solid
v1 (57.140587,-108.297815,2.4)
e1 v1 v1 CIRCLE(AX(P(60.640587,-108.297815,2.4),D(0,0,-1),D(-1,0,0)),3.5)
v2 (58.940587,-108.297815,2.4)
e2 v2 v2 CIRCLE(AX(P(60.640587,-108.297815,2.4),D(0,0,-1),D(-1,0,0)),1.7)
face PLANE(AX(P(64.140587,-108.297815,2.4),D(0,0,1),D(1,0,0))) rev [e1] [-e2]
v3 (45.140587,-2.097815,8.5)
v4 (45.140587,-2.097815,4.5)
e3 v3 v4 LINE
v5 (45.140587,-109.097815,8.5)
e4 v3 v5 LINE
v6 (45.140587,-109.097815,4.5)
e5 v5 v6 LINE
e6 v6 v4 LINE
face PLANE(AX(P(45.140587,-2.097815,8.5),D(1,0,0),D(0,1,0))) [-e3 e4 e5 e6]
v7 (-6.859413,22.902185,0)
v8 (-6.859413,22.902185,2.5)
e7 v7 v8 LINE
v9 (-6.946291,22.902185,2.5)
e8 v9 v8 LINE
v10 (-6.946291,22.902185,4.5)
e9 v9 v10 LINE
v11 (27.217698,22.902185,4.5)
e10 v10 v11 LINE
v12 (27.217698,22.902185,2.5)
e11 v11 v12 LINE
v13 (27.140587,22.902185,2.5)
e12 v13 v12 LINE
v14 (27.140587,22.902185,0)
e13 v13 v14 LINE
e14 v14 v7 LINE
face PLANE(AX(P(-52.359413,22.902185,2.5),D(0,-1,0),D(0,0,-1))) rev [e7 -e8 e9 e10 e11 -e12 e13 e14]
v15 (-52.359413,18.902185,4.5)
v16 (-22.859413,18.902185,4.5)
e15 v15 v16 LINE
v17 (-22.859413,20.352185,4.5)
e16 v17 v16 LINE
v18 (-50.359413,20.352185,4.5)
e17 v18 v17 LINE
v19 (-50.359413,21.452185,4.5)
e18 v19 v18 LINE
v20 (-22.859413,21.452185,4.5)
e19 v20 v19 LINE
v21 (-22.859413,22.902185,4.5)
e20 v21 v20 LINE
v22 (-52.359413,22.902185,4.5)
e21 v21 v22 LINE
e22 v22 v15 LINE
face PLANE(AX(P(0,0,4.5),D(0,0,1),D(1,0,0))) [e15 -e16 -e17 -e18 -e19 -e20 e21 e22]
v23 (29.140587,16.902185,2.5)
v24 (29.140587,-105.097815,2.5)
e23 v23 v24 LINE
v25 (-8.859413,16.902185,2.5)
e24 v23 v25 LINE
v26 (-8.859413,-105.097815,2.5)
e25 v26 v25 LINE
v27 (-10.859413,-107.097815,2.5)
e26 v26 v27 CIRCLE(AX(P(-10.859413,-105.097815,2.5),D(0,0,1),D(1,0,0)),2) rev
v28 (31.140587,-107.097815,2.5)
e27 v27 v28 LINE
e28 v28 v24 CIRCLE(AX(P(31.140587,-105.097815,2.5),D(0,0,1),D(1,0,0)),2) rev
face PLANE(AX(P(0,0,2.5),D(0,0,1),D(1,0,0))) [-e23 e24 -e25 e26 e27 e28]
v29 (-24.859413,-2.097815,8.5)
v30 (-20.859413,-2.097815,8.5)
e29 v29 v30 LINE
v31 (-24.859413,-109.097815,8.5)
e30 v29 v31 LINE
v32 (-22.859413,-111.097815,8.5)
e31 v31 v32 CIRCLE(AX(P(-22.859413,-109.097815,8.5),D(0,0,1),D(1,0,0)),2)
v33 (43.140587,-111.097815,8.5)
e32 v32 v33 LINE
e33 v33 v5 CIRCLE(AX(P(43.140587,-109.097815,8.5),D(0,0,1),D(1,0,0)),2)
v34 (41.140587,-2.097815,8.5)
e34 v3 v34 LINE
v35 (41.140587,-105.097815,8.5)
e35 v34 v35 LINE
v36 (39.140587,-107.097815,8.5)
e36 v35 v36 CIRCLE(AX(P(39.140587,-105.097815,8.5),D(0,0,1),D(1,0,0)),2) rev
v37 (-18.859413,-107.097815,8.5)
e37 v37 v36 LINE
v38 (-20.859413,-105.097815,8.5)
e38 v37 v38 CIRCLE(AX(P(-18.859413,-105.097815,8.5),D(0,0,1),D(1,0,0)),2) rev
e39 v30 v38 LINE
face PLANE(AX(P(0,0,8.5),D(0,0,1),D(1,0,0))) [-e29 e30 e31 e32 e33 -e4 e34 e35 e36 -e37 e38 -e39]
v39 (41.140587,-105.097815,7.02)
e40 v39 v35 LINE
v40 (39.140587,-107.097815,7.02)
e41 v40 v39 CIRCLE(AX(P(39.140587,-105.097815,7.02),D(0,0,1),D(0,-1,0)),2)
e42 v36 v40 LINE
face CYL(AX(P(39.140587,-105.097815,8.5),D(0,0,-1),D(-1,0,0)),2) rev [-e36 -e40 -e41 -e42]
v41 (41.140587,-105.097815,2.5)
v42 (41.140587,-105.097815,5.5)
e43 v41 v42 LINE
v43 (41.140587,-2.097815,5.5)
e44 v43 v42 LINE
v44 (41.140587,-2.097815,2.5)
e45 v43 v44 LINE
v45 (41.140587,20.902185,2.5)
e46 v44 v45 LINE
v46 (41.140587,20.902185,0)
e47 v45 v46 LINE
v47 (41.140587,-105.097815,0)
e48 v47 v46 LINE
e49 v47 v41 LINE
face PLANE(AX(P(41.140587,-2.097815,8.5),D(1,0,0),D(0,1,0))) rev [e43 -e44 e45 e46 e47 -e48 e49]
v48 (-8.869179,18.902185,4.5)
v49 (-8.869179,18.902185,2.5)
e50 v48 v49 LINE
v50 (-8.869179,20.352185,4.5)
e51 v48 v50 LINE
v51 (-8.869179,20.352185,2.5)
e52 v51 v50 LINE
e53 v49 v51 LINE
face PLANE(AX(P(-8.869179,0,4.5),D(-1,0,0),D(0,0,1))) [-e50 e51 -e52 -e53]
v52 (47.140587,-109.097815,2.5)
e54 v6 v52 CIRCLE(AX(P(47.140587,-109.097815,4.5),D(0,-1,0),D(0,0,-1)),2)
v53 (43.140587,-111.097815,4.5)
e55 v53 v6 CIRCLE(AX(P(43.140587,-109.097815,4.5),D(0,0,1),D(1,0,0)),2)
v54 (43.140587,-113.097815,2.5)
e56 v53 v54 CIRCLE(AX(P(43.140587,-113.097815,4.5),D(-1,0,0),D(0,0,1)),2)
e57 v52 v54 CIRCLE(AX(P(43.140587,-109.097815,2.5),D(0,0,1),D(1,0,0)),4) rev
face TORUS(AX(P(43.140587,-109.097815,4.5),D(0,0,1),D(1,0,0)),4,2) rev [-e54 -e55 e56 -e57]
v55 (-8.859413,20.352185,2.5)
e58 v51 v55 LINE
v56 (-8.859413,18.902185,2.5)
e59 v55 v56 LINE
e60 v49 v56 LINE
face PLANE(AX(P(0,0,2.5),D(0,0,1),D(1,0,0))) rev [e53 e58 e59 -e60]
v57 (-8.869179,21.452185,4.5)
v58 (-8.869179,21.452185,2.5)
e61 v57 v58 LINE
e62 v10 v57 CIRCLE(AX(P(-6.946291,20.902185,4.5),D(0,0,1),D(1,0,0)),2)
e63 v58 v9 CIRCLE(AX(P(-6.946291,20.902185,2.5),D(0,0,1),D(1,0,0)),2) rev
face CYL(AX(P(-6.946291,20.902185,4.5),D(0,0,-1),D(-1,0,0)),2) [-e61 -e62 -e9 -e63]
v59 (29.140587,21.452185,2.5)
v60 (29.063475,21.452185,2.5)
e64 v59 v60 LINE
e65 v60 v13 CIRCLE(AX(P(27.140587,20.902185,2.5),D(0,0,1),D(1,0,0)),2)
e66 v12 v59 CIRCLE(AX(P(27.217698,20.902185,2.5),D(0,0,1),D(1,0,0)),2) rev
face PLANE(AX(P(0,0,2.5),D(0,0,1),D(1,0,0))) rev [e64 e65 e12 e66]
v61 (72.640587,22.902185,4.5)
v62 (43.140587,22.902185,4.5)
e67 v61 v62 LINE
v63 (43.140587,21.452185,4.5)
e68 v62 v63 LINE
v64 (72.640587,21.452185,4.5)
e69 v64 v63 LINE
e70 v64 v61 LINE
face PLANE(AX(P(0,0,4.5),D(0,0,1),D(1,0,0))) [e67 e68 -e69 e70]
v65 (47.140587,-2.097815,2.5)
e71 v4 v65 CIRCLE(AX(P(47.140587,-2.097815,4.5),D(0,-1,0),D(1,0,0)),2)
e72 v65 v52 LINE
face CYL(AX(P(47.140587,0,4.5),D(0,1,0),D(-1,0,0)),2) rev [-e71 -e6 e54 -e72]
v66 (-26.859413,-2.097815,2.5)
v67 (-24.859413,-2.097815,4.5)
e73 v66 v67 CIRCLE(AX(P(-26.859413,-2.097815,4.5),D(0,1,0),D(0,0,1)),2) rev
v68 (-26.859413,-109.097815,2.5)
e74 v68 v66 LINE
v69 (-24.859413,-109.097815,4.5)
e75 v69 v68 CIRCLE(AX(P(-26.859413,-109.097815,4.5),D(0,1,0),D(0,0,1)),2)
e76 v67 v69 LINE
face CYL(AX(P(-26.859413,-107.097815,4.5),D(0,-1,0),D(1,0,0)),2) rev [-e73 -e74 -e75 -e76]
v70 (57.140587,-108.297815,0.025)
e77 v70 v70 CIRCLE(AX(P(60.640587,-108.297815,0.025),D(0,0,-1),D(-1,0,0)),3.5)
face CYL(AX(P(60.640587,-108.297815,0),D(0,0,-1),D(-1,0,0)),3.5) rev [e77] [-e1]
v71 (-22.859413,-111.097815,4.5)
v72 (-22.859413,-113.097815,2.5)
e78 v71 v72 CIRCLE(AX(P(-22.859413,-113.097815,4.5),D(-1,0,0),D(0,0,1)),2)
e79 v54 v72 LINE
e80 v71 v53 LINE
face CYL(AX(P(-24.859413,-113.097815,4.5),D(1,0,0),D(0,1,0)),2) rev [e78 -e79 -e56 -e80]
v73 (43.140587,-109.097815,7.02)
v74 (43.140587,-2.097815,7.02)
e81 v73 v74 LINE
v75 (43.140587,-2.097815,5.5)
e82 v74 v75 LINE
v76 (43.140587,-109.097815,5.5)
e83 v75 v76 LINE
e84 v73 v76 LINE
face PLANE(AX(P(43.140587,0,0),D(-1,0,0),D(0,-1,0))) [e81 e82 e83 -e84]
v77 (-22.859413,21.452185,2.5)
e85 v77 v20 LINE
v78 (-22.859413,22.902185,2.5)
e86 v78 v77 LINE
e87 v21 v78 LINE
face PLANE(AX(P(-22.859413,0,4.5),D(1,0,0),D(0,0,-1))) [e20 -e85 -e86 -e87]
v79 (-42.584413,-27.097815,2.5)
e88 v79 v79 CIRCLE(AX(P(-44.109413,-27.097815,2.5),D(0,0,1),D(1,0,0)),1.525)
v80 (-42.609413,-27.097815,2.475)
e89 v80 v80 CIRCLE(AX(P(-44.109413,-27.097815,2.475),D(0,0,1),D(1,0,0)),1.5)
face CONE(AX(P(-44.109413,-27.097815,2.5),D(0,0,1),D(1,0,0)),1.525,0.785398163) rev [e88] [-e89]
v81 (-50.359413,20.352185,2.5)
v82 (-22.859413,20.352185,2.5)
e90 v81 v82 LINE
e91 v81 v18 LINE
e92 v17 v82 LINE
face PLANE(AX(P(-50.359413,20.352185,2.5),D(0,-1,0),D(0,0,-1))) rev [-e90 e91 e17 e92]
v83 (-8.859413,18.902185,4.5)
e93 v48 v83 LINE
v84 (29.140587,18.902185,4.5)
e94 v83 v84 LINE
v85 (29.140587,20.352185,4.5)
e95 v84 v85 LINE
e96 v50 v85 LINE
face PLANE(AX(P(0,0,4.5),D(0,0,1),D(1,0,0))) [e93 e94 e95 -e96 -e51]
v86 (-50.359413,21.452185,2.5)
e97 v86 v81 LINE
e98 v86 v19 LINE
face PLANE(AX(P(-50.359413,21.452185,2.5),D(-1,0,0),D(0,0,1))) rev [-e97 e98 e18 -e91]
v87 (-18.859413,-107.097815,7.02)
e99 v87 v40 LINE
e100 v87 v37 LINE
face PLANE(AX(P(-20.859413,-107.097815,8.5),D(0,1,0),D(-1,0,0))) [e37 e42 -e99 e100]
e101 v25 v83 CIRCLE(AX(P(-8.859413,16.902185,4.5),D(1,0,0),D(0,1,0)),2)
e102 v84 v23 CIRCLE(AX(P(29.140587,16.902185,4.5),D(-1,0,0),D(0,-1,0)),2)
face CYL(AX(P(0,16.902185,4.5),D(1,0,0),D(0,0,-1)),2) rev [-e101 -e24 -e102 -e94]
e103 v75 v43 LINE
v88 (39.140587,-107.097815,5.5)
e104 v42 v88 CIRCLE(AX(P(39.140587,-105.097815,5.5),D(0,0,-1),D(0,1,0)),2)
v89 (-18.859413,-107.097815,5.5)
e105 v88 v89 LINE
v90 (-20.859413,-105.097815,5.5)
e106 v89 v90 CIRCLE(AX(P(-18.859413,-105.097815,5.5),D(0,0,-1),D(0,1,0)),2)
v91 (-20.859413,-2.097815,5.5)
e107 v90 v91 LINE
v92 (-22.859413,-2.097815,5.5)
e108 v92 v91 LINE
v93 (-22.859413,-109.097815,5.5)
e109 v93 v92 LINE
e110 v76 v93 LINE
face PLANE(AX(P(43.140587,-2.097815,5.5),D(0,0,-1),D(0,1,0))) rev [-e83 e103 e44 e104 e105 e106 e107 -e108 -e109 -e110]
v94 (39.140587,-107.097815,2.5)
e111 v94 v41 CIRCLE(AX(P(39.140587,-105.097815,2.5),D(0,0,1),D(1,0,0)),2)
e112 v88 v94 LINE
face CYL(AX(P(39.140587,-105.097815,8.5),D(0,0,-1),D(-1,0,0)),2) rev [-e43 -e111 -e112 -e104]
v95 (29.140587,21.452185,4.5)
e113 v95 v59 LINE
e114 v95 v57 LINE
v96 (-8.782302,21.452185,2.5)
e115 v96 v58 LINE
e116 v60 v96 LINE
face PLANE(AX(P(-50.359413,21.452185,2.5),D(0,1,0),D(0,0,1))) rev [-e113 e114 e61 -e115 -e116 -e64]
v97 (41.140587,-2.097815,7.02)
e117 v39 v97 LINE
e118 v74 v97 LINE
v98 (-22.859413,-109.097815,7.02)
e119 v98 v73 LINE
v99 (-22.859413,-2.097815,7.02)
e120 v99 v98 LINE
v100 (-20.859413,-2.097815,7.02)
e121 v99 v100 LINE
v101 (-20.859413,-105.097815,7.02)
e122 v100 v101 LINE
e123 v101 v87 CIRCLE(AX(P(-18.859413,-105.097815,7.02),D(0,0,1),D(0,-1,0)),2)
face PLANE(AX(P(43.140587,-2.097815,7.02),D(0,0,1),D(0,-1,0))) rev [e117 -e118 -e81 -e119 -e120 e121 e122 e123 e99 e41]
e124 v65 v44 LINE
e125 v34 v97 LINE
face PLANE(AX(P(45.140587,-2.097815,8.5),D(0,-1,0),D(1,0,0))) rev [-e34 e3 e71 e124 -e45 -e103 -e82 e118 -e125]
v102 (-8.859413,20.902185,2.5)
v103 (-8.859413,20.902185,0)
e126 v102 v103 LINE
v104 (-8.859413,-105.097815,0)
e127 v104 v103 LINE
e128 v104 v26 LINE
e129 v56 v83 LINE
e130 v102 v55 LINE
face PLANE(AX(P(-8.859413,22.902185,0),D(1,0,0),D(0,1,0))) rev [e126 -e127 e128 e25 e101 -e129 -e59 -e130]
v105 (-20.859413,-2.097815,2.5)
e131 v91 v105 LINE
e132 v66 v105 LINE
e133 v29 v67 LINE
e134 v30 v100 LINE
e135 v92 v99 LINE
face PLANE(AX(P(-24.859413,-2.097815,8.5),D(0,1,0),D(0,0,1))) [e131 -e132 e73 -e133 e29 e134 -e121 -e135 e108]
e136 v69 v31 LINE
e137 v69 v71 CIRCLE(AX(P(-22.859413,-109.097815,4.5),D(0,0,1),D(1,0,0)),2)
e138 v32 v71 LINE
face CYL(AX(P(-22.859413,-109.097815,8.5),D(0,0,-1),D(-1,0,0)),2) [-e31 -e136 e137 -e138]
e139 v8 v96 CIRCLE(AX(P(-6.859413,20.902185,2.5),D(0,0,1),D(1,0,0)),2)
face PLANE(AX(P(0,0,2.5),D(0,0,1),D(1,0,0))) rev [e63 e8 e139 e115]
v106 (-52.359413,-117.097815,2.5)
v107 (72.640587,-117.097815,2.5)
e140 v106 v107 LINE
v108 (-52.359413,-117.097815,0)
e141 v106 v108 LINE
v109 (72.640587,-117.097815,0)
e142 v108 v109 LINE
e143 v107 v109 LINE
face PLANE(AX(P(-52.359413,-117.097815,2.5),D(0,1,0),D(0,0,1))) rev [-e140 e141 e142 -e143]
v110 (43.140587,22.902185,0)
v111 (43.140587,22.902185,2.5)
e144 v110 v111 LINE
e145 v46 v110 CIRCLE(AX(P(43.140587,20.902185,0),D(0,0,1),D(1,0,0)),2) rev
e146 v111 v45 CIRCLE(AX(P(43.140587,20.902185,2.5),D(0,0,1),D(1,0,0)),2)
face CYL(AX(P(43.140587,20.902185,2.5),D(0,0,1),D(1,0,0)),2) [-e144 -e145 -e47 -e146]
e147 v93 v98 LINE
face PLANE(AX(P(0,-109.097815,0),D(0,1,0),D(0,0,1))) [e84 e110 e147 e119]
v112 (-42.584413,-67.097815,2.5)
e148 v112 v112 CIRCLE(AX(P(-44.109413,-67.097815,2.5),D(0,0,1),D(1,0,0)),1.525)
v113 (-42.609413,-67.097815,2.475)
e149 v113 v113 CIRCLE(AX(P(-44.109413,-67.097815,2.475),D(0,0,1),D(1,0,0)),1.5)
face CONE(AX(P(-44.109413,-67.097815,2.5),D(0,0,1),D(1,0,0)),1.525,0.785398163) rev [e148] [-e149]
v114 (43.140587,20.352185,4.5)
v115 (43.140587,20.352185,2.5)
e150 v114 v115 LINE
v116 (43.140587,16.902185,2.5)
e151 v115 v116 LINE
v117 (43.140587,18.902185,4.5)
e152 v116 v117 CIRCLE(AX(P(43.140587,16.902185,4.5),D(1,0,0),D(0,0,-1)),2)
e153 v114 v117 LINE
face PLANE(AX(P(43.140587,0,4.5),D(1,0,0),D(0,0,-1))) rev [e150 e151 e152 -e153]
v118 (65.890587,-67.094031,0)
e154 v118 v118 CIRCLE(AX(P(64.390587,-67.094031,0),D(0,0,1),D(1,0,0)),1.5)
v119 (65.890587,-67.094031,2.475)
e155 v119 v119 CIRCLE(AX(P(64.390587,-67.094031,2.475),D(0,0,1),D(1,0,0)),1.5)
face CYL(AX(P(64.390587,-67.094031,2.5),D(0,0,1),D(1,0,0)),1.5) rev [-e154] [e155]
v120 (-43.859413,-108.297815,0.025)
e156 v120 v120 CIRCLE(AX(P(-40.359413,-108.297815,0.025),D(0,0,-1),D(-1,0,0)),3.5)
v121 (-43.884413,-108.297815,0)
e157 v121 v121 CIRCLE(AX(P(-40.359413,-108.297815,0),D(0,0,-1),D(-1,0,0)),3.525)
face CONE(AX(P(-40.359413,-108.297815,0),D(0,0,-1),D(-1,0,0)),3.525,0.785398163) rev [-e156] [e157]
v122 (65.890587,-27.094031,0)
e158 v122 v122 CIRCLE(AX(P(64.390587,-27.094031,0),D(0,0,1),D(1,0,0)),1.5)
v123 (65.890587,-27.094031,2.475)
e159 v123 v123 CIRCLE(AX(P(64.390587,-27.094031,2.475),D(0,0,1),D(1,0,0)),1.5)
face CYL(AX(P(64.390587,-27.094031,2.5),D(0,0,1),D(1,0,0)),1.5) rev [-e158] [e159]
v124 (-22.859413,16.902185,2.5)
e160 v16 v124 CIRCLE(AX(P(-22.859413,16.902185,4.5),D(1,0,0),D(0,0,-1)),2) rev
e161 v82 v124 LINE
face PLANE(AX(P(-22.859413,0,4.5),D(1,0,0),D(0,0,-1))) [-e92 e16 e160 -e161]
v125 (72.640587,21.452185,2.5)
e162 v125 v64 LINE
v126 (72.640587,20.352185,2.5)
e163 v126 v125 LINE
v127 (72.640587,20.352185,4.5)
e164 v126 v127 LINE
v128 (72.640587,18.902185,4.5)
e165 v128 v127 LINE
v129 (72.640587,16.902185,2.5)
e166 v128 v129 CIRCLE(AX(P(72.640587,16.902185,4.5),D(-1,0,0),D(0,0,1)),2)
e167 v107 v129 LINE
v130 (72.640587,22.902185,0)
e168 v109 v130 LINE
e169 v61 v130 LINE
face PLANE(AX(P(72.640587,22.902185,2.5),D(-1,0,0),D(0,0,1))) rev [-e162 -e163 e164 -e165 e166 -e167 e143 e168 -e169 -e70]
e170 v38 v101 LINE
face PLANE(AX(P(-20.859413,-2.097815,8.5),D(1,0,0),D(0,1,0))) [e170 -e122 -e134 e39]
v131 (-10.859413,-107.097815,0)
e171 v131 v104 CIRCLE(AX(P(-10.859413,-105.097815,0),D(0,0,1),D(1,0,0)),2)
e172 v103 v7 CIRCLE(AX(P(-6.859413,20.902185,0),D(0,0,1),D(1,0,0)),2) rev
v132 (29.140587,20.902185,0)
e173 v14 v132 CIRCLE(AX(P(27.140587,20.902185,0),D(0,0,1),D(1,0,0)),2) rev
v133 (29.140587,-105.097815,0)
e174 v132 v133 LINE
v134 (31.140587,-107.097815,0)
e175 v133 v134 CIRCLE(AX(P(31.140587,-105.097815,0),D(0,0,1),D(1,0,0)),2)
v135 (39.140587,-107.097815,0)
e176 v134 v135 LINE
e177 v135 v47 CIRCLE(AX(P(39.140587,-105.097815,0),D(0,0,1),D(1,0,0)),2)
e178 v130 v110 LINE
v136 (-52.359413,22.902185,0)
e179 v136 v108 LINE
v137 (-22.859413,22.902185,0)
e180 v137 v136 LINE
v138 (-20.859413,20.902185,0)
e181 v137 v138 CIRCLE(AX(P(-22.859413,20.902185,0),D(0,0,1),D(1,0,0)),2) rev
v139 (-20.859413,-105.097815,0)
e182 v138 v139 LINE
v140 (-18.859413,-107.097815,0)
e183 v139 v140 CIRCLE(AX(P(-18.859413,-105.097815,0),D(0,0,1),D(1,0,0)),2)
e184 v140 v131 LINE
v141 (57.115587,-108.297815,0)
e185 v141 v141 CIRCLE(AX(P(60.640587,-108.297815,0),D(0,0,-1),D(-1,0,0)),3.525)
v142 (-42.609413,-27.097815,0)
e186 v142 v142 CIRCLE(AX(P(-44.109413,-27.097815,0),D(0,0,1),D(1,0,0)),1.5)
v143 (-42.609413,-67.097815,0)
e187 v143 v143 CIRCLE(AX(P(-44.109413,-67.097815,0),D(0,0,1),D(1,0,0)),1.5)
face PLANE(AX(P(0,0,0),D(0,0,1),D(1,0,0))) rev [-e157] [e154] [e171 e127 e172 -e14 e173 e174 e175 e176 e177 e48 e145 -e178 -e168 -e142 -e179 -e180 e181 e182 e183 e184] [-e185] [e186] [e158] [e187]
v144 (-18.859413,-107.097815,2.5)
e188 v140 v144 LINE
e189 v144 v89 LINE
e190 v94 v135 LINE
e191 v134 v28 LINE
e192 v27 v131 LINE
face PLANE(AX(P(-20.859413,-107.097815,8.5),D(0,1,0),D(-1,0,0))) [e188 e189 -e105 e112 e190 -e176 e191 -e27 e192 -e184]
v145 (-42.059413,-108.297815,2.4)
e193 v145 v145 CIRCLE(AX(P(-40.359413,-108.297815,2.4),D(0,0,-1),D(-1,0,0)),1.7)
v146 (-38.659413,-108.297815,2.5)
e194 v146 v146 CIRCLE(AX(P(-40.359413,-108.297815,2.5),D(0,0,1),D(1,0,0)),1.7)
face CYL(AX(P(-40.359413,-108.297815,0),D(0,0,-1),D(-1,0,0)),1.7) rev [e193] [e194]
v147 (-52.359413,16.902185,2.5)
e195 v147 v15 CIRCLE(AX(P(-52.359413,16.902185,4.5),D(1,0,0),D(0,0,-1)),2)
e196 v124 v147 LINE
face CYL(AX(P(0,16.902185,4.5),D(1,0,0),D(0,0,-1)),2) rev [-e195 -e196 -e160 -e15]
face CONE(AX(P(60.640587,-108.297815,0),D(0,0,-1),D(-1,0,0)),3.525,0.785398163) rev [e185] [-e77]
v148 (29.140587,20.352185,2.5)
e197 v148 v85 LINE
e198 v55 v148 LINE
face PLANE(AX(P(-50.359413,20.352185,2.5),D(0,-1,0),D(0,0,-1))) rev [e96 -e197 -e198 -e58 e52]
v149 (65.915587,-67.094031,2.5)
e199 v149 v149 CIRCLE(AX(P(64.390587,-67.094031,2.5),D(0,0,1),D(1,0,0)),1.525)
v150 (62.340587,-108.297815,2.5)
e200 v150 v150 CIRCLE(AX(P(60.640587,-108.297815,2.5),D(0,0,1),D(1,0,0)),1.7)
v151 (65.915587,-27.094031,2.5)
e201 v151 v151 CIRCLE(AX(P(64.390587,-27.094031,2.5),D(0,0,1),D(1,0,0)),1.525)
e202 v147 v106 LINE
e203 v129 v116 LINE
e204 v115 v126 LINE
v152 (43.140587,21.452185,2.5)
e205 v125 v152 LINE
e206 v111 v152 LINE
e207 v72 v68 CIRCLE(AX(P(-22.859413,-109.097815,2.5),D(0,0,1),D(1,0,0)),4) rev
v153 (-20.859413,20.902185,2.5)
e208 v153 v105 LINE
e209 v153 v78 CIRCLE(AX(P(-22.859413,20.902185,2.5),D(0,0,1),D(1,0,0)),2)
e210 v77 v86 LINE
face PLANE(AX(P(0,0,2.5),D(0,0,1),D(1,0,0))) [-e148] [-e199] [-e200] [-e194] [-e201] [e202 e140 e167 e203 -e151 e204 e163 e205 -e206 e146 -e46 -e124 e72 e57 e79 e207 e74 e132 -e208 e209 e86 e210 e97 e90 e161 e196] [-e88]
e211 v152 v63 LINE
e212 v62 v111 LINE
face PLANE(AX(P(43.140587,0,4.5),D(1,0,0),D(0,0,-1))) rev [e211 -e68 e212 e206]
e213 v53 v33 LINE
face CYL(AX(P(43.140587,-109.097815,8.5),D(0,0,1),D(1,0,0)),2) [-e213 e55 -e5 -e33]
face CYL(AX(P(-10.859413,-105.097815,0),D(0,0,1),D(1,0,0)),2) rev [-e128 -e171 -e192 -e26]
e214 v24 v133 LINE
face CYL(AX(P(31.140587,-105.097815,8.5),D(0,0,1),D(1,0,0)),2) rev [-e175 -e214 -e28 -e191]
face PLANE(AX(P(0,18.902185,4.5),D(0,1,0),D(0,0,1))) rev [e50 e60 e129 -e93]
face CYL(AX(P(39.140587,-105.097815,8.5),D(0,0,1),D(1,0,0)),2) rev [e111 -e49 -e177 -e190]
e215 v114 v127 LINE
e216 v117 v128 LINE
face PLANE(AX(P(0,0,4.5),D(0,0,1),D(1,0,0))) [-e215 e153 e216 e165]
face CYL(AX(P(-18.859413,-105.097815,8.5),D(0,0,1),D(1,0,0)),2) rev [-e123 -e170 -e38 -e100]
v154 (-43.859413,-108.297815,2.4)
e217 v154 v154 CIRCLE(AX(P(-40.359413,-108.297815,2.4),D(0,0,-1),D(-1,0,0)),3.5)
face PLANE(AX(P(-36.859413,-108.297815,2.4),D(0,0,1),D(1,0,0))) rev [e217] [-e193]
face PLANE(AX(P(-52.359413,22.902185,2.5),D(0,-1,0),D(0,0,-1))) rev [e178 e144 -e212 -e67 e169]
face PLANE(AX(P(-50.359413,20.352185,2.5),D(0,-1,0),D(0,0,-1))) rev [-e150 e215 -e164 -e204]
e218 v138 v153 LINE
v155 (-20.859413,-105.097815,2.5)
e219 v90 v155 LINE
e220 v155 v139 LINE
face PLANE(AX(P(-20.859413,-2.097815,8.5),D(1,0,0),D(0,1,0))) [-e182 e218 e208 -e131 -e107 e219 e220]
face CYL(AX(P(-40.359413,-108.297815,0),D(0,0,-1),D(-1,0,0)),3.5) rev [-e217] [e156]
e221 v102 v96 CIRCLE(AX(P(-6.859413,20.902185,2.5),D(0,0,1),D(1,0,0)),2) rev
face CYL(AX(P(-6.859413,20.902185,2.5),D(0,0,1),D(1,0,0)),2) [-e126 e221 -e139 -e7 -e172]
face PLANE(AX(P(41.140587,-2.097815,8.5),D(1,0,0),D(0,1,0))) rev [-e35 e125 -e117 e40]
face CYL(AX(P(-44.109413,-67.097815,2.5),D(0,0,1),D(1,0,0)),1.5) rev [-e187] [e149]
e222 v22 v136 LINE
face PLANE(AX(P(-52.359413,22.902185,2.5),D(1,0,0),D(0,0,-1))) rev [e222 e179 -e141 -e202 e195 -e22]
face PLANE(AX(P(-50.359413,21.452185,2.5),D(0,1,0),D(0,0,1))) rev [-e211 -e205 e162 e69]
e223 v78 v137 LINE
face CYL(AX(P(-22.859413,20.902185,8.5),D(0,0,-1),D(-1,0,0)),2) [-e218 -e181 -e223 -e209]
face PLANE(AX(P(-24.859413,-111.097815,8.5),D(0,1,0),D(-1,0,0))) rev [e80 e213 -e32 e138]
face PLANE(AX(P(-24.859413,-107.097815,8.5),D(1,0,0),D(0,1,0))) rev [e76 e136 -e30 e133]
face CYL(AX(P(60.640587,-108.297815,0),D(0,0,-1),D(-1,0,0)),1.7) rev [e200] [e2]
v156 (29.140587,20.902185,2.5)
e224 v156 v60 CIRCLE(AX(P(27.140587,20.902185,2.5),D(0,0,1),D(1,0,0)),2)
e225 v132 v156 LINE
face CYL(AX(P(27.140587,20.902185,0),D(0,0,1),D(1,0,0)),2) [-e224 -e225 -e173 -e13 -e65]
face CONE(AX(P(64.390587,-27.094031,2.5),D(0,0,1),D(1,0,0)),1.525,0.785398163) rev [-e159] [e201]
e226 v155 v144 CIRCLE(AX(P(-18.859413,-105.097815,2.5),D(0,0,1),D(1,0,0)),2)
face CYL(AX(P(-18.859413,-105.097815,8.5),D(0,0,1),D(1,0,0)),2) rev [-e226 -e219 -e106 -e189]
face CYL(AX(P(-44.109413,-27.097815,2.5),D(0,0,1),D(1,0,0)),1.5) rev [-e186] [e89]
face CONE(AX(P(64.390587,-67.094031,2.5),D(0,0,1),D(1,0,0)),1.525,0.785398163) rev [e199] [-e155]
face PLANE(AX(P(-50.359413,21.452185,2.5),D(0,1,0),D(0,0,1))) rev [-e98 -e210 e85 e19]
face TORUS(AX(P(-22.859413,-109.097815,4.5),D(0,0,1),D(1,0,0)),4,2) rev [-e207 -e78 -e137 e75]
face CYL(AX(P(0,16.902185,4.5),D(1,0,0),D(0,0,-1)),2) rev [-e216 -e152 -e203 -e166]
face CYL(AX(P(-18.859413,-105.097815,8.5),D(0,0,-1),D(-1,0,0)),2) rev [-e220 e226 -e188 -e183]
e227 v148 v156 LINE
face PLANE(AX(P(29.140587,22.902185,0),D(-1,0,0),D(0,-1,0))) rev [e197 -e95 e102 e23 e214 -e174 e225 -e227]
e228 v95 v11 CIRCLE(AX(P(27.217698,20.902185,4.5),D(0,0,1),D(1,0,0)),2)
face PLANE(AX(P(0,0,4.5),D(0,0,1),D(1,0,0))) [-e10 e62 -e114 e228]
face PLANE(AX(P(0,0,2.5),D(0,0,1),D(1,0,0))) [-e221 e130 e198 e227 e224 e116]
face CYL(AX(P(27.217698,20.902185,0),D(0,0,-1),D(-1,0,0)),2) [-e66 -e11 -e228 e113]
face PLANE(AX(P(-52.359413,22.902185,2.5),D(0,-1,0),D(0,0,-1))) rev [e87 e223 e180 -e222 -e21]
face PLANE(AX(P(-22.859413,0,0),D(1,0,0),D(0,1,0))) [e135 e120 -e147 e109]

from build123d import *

# Parameters (mm, degrees)
ESBO_O1_W                                    = 125
ESBO_O1_H                                    = 140
RESSALTO_EXTRUS_O1_DEPTH                     = 2.5
RESSALTO_EXTRUS_O2_DEPTH                     = 6
ESBO_O3_W                                    = 1.52
ESBO_O3_H                                    = 105
CORTE_EXTRUS_O1_DEPTH                        = 2
ESBO_O4_W                                    = 1.52
ESBO_O4_H                                    = 105
CORTE_EXTRUS_O2_DEPTH                        = 2
ESBO_O5_W                                    = 66
ESBO_O5_H                                    = 1.52
CORTE_EXTRUS_O3_DEPTH                        = 2
FILETE1_R                                    = 2
FILETE2_R                                    = 2
FILETE3_R                                    = 2
ESBO_O6_W                                    = 12
ESBO_O6_H                                    = 130
CORTE_EXTRUS_O4_DEPTH                        = 138.929522592
FILETE4_R                                    = 2
FILETE5_R                                    = 2
ESBO_O7_W                                    = 19.009766083
ESBO_O7_H                                    = 4
ESBO_O7_W_2                                  = 19
ESBO_O7_W_3                                  = 29.5
RESSALTO_EXTRUS_O3_DEPTH                     = 2
ESBO_O8_W                                    = 123
ESBO_O8_H                                    = 1.1
CORTE_EXTRUS_O5_DEPTH                        = 2
FILETE6_R                                    = 2
FUROS_GUIA_COM_3_0MM1_D                      = 3
FUROS_GUIA_COM_3_0MM1_CSINK_D                = 3.05
FUROS_GUIA_COM_3_0MM1_CSINK_ANGLE            = 90
REBAIXO_PARA_PARAFUSO_COM_CABE_A_PAN_2_COUNT = 2
REBAIXO_PARA_PARAFUSO_COM_CABE_A_PAN_2_PITCH = 101


with BuildPart() as part:
    # Esboço1 → Ressalto-extrusão1 (new body)
    with BuildSketch(Plane.XY):
        with Locations((10.140586838, -47.097815293)):
            Rectangle(ESBO_O1_W, ESBO_O1_H)
    extrude(amount=RESSALTO_EXTRUS_O1_DEPTH)

    # Esboço2 → Ressalto-extrusão2 (add)
    with BuildSketch(Plane.XY.offset(2.5)):
        Polygon((-24.859413162, -2.097815293), (-20.859413162, -2.097815293), (-20.859413162, -107.097815293), (41.140586838, -107.097815293), (41.140586838, -2.097815293), (45.140586838, -2.097815293), (45.140586838, -107.097815293), (45.140586838, -111.097815293), (-24.859413162, -111.097815293), (-24.859413162, -107.097815293), align=None)
    extrude(amount=RESSALTO_EXTRUS_O2_DEPTH)

    # Esboço3 → Corte-extrusão1 (cut)
    with BuildSketch(Plane.ZY.offset(-41.140586838)):
        with Locations((6.26, -54.597815293)):
            Rectangle(ESBO_O3_W, ESBO_O3_H)
    extrude(amount=-CORTE_EXTRUS_O1_DEPTH, mode=Mode.SUBTRACT)

    # Esboço4 → Corte-extrusão2 (cut)
    with BuildSketch(Plane(origin=(-20.859413162, 0, 0), x_dir=(0, 0, -1), z_dir=(1, 0, 0))):
        with Locations((-6.26, -54.597815293)):
            Rectangle(ESBO_O4_W, ESBO_O4_H)
    extrude(amount=-CORTE_EXTRUS_O2_DEPTH, mode=Mode.SUBTRACT)

    # Esboço5 → Corte-extrusão3 (cut)
    with BuildSketch(Plane(origin=(0, -107.097815293, 0), x_dir=(1, 0, 0), z_dir=(0, 1, 0))):
        with Locations((10.140586838, -6.26)):
            Rectangle(ESBO_O5_W, ESBO_O5_H)
    extrude(amount=-CORTE_EXTRUS_O3_DEPTH, mode=Mode.SUBTRACT)

    # Filete1
    filete1_edges = [part.edges().sort_by_distance(p)[0] for p in [
        (41.140586838, -107.097815293, 7.76),
        (-20.859413162, -107.097815293, 7.76),
        (41.140586838, -107.097815293, 4),
        (-20.859413162, -107.097815293, 4),
    ]]
    fillet(filete1_edges, radius=FILETE1_R)

    # Filete2
    filete2_edges = [part.edges().sort_by_distance(p)[0] for p in [
        (-24.859413162, -111.097815293, 5.5),
        (45.140586838, -111.097815293, 5.5),
    ]]
    fillet(filete2_edges, radius=FILETE2_R)

    # Filete3
    filete3_edges = [part.edges().sort_by_distance(p)[0] for p in [
        (10.140586838, -111.097815293, 2.5),
        (-24.273626724, -110.512028855, 2.5),
        (44.5548004, -110.512028855, 2.5),
        (-24.859413162, -55.597815293, 2.5),
        (45.140586838, -55.597815293, 2.5),
    ]]
    fillet(filete3_edges, radius=FILETE3_R)

    # Esboço6 → Corte-extrusão4 (cut, through all)
    with BuildSketch(Plane.XY.offset(2.5)):
        with Locations((-14.859413162, -42.097815293)):
            Rectangle(ESBO_O6_W, ESBO_O6_H)
        with Locations((35.140586838, -42.097815293)):
            Rectangle(ESBO_O6_W, ESBO_O6_H)
    extrude(amount=-CORTE_EXTRUS_O4_DEPTH, mode=Mode.SUBTRACT)

    # Filete4
    filete4_edges = [part.edges().sort_by_distance(p)[0] for p in [
        (-20.859413162, 22.902184707, 1.25),
        (-8.859413162, 22.902184707, 1.25),
        (41.140586838, 22.902184707, 1.25),
        (29.140586838, 22.902184707, 1.25),
    ]]
    fillet(filete4_edges, radius=FILETE4_R)

    # Filete5
    filete5_edges = [part.edges().sort_by_distance(p)[0] for p in [
        (-20.859413162, -107.097815293, 1.25),
        (-8.859413162, -107.097815293, 1.25),
        (41.140586838, -107.097815293, 1.25),
        (29.140586838, -107.097815293, 1.25),
    ]]
    fillet(filete5_edges, radius=FILETE5_R)

    # Esboço7 → Ressalto-extrusão3 (add)
    with BuildSketch(Plane.XY.offset(2.5)):
        with Locations((0.635703797, 20.902184707)):
            Rectangle(ESBO_O7_W, ESBO_O7_H)
        with Locations((19.640586838, 20.902184707)):
            Rectangle(ESBO_O7_W_2, ESBO_O7_H)
        with Locations((-37.609413162, 20.902184707)):
            Rectangle(ESBO_O7_W_3, ESBO_O7_H)
        with Locations((57.890586838, 20.902184707)):
            Rectangle(ESBO_O7_W_3, ESBO_O7_H)
    extrude(amount=RESSALTO_EXTRUS_O3_DEPTH)

    # Esboço8 → Corte-extrusão5 (cut)
    with BuildSketch(Plane.XY.offset(4.5)):
        with Locations((11.140586838, 20.902184707)):
            Rectangle(ESBO_O8_W, ESBO_O8_H)
    extrude(amount=-CORTE_EXTRUS_O5_DEPTH, mode=Mode.SUBTRACT)

    # Filete6
    # the kernel refuses this fillet: 2 mm, written as the material it adds along each edge
    with BuildSketch(Plane(origin=(29.140586838, 18.902184707, 2.5), x_dir=(0, 0, 1), z_dir=(-1, 0, 0))) as filete6_piece_1:
        with BuildLine():
            CenterArc((FILETE6_R, -FILETE6_R), FILETE6_R, 90, 90)
            Line((0, -FILETE6_R), (0, 0))
            Line((0, 0), (FILETE6_R, 0))
        make_face()
    extrude(amount=38)
    with BuildSketch(Plane(origin=(-52.359413162, 18.902184707, 2.5), x_dir=(0, 0, 1), z_dir=(1, 0, 0)), Plane(origin=(43.140586838, 18.902184707, 2.5), x_dir=(0, 0, 1), z_dir=(1, 0, 0))) as filete6_piece_2:
        with BuildLine():
            CenterArc((FILETE6_R, FILETE6_R), FILETE6_R, 180, 90)
            Line((0, FILETE6_R), (0, 0))
            Line((0, 0), (FILETE6_R, 0))
        make_face()
    extrude(amount=29.5)
    # the kernel refuses this fillet: 2 mm, written as the material it takes off along each edge
    with BuildSketch(Plane(origin=(29.140586838, 22.902184707, -2.307221131), x_dir=(-1, 0, 0), z_dir=(0, 0, 1))) as filete6_2_piece_1:
        with BuildLine():
            CenterArc((1.922888452, 2), FILETE6_R, 195.962014163, 74.037985837)
            Line((0, 1.45), (0, 0))
            Line((0, 0), (1.922888452, 0))
        make_face()
    extrude(amount=11.614442262, mode=Mode.SUBTRACT)
    with BuildSketch(Plane(origin=(-8.869179245, 22.902184707, -2.307221131), x_dir=(1, 0, 0), z_dir=(0, 0, 1))) as filete6_2_piece_2:
        with BuildLine():
            CenterArc((1.922888452, -2), FILETE6_R, 90, 74.037985837)
            Line((0, -1.45), (0, 0))
            Line((0, 0), (1.922888452, 0))
        make_face()
    extrude(amount=11.614442262, mode=Mode.SUBTRACT)

    # Furos-guia com Ø3.0mm1 (through all)
    with Locations(Plane.XY.offset(2.5)):
        with Locations((-44.109413162, -27.097815293), (-44.109413162, -67.097815293), (64.390586838, -27.094030717), (64.390586838, -67.094030814)):
            CounterSinkHole(FUROS_GUIA_COM_3_0MM1_D / 2, FUROS_GUIA_COM_3_0MM1_CSINK_D / 2, counter_sink_angle=FUROS_GUIA_COM_3_0MM1_CSINK_ANGLE)

    # Esboço14 → Rebaixo para parafuso com cabeça panela de M31 (revolve, cut)
    with BuildSketch(Plane(origin=(-40.359413162, -108.297815293, 0), x_dir=(0, 1, 0), z_dir=(1, 0, 0))):
        Polygon((0, 0), (0, 8.5), (1.7, 8.5), (1.7, 2.4), (3.5, 2.4), (3.5, 0.025), (3.525, 0), align=None)
    rebaixo_para_parafuso_com_cabe_a_panela = revolve(axis=Axis((-40.359413162, -108.297815293, -6.35), (0, 0, 1)), mode=Mode.SUBTRACT)

    # Rebaixo para parafuso com cabe_a pan 2: Rebaixo para parafuso com cabeça panela de M31 ×2
    with Locations(*[(i * REBAIXO_PARA_PARAFUSO_COM_CABE_A_PAN_2_PITCH, 0, 0) for i in range(1, REBAIXO_PARA_PARAFUSO_COM_CABE_A_PAN_2_COUNT)]):
        add(rebaixo_para_parafuso_com_cabe_a_panela, mode=Mode.SUBTRACT)


solid = part.part
